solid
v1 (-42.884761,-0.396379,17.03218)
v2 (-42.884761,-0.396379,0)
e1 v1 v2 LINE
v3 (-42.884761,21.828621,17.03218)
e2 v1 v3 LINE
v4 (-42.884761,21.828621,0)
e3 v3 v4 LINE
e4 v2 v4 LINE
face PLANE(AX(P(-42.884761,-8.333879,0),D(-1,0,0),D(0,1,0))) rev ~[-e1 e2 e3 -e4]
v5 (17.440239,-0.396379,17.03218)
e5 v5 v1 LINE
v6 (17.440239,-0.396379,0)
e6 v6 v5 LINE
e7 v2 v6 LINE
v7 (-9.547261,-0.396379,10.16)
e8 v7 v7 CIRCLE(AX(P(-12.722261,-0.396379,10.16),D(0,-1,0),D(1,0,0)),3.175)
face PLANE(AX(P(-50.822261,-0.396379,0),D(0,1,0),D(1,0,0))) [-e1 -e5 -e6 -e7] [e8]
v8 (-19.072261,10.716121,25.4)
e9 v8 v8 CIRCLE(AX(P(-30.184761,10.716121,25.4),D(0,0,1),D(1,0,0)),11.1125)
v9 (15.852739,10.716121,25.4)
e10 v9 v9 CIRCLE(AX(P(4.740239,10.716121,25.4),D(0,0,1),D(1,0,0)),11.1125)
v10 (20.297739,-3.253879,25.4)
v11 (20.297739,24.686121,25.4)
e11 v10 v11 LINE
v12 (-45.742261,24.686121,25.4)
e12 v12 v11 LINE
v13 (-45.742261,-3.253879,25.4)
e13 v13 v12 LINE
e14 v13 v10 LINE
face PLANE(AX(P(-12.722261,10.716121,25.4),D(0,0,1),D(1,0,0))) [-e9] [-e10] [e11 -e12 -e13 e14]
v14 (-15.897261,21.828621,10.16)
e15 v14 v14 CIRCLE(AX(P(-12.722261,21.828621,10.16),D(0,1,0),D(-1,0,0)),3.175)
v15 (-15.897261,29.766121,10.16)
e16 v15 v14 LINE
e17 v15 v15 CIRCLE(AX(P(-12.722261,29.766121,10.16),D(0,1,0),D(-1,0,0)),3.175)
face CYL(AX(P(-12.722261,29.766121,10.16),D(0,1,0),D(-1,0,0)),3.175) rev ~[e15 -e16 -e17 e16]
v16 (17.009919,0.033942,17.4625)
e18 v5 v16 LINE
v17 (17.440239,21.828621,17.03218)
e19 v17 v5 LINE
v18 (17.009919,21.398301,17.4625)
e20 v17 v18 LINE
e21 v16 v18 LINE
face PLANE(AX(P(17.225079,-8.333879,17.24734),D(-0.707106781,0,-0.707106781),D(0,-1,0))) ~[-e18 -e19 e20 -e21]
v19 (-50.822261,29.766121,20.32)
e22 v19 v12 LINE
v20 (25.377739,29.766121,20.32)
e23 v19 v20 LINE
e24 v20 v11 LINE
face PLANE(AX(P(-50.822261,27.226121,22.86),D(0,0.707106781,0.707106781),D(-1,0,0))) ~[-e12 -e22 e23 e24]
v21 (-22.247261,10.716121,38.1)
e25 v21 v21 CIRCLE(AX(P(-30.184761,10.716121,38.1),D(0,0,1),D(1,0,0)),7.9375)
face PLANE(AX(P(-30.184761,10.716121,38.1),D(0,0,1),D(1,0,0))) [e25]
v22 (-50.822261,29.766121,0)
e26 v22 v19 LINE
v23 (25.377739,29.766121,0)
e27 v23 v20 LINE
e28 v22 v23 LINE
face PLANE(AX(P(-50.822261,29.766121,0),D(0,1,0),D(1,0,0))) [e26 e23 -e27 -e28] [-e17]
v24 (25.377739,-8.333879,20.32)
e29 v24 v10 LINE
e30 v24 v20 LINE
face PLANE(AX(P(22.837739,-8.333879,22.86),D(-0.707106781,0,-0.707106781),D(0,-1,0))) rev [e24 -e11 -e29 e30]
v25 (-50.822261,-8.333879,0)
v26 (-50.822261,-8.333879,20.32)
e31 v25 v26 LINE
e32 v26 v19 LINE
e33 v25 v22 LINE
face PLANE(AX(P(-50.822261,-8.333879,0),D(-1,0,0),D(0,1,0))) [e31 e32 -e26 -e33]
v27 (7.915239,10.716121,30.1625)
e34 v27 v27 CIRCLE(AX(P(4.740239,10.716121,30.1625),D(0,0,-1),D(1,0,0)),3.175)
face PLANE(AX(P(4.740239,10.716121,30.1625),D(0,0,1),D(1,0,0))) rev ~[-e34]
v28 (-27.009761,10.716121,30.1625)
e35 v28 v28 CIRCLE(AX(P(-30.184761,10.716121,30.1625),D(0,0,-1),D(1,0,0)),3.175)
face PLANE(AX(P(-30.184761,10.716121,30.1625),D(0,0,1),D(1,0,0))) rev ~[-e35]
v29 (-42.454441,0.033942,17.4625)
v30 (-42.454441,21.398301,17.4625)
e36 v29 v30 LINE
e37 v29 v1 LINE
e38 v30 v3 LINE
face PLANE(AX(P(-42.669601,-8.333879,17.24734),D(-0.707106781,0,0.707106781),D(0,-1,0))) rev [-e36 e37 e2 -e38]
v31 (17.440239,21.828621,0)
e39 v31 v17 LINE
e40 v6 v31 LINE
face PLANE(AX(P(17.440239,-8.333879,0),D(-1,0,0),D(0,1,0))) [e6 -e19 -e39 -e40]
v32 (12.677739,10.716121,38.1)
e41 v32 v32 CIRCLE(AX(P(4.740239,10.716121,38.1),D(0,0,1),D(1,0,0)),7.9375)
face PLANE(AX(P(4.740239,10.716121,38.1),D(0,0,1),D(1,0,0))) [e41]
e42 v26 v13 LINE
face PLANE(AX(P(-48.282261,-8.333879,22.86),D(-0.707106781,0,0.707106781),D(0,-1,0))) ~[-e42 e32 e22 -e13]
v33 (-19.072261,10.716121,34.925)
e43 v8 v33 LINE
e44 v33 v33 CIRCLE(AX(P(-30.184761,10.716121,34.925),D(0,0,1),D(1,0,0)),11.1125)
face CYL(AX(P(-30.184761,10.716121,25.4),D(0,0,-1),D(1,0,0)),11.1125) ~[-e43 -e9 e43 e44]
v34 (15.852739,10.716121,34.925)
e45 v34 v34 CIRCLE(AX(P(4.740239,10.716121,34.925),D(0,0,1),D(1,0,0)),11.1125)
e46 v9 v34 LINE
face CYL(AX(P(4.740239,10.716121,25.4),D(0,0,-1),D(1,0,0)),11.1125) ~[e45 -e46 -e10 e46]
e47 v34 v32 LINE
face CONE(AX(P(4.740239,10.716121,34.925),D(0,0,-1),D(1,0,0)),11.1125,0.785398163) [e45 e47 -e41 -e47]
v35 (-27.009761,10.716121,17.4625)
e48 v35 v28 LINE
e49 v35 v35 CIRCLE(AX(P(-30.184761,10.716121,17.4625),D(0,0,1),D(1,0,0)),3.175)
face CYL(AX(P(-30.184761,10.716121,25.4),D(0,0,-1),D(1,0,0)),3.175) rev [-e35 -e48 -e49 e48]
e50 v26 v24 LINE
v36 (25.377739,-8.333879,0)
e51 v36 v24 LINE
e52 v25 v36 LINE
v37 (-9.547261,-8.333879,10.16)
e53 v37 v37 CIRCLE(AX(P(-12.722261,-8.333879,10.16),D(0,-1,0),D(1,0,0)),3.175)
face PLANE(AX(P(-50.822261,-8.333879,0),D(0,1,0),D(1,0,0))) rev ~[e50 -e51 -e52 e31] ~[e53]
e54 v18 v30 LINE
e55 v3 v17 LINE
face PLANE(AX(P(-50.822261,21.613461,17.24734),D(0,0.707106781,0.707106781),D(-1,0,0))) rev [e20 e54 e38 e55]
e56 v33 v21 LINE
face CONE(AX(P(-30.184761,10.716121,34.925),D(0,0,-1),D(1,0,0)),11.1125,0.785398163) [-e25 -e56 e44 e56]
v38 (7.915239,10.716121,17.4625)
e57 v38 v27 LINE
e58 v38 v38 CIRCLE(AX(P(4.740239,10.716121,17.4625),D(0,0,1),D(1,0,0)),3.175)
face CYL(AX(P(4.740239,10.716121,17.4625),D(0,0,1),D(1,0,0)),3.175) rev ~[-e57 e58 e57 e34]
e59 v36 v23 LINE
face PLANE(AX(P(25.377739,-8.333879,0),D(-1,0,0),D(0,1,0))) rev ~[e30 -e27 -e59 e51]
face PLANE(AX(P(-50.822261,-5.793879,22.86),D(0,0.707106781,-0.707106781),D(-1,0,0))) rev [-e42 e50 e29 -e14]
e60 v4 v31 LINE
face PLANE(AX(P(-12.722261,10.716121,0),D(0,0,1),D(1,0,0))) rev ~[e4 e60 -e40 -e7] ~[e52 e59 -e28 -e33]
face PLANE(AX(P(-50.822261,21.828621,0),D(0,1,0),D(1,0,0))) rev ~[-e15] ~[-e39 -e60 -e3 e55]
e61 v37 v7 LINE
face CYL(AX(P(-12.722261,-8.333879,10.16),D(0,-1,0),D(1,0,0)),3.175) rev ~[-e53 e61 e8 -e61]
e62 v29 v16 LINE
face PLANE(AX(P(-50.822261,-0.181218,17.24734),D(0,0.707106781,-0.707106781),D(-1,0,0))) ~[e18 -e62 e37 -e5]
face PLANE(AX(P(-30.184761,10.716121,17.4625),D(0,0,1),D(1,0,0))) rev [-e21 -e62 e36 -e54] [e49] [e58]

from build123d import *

# Parameters (mm, degrees)
F0_W      = 76.2
F0_H      = 38.1
F1_DEPTH  = 25.4
F2_SIZE   = 5.08
F3_R      = 11.1125
F4_DEPTH  = 12.7
F5_SIZE   = 3.175
F7_T      = 7.9375
F6_R      = 3.175
F8_DEPTH  = 7.9375
F9_R      = 3.175
F10_DEPTH = 7.9375


# Not quite as in the source:
# - a shell that OpenCascade refuses in one call is made with other operations: the cavity is built on its own and cut out


with BuildPart() as f1:
    # F0 (on Top) → F1 (new body)
    with BuildSketch(Plane.XY):
        with Locations((-12.72226125, 10.7161214997)):
            Rectangle(F0_W, F0_H)
    extrude(amount=F1_DEPTH)

    # F2
    f2_edges = [f1.edges().sort_by_distance(p)[0] for p in [
        (-50.822261, 10.716121, 25.4),
        (-12.722261, 29.766121, 25.4),
        (-12.722261, -8.333879, 25.4),
        (25.377739, 10.716121, 25.4),
    ]]
    chamfer(f2_edges, length=F2_SIZE)

    # F3 (on face) → F4 (join)
    with BuildSketch(Plane.XY.offset(25.4)):
        with Locations((-30.18476125, 10.7161214997)):
            Circle(F3_R)
        with Locations((4.74023875, 10.7161214997)):
            Circle(F3_R)
    extrude(amount=F4_DEPTH)

    # F5
    f5_edges = [f1.edges().sort_by_distance(p)[0] for p in [
        (-41.297261, 10.716121, 38.1),
        (-6.372261, 10.716121, 38.1),
    ]]
    chamfer(f5_edges, length=F5_SIZE)

    # F7: shell of thickness 7.9375, made by hand


with BuildPart() as f7_core1:
    # F7_t2: copy of F1
    add(f1.part)

    # the walls: a layer under each face that stays
    f7_faces = [f7_core1.faces().sort_by_distance(p)[0] for p in [
        (-41.29726125, 10.7161214997, 30.1625),
        (-39.70976125, 10.7161214997, 36.5125),
        (-12.72226125, 10.7161214997, 25.4),
        (-30.18476125, 10.7161214997, 38.1),
        (-48.28226125, 10.7161214997, 22.86),
        (-12.72226125, 27.2261214997, 22.86),
        (-12.72226125, -5.7938785003, 22.86),
        (22.83773875, 10.7161214997, 22.86),
        (-6.37226125, 10.7161214997, 30.1625),
        (-50.82226125, 10.7161214997, 10.16),
        (-12.72226125, 29.7661214997, 10.16),
        (-12.72226125, -8.3338785003, 10.16),
        (25.37773875, 10.7161214997, 10.16),
        (-4.78476125, 10.7161214997, 36.5125),
        (4.74023875, 10.7161214997, 38.1),
    ]]
    thicken(f7_faces, amount=-F7_T, mode=Mode.SUBTRACT)

    # F7_s3 → F7_t4 (revolve, cut)
    with BuildSketch(Plane.XZ.offset(-10.7161214997)):
        Polygon((-18.99288625, 25.479375), (-27.00976125, 25.4), (-27.00976125, 17.4625), (-19.07226125, 17.4625), align=None)
    revolve(axis=Axis((-30.18476125, 10.7161214997, 25.4), (0, 0, 1)), mode=Mode.SUBTRACT)

    # F7_s5 → F7_t6 (revolve, cut)
    with BuildSketch(Plane.XZ.offset(-10.7161214997)):
        Polygon((15.93211375, 25.479375), (15.85273875, 17.4625), (7.91523875, 17.4625), (7.91523875, 25.4), align=None)
    revolve(axis=Axis((4.74023875, 10.7161214997, 25.4), (0, 0, 1)), mode=Mode.SUBTRACT)


with BuildPart() as f1_1:
    add(f1.part)

    # what is left inside the walls is the cavity
    f7_cavity = [f7_core1.part.solids().sort_by_distance(p)[0] for p in [
        (-12.722261, 7.011955, 0.079375),
    ]]
    add(f7_cavity, mode=Mode.SUBTRACT)

    # F6 (on face) → F8 (cut)
    with BuildSketch(Plane.XZ.offset(8.3338785003)):
        with Locations((-12.72226125, 10.16)):
            Circle(F6_R)
    extrude(amount=-F8_DEPTH, mode=Mode.SUBTRACT)

    # F9 (on face) → F10 (cut)
    with BuildSketch(Plane(origin=(0, 29.7661214997, 0), x_dir=(-1, 0, 0), z_dir=(0, 1, 0))):
        with Locations((12.72226125, 10.16)):
            Circle(F9_R)
    extrude(amount=-F10_DEPTH, mode=Mode.SUBTRACT)


solid = f1_1.part
